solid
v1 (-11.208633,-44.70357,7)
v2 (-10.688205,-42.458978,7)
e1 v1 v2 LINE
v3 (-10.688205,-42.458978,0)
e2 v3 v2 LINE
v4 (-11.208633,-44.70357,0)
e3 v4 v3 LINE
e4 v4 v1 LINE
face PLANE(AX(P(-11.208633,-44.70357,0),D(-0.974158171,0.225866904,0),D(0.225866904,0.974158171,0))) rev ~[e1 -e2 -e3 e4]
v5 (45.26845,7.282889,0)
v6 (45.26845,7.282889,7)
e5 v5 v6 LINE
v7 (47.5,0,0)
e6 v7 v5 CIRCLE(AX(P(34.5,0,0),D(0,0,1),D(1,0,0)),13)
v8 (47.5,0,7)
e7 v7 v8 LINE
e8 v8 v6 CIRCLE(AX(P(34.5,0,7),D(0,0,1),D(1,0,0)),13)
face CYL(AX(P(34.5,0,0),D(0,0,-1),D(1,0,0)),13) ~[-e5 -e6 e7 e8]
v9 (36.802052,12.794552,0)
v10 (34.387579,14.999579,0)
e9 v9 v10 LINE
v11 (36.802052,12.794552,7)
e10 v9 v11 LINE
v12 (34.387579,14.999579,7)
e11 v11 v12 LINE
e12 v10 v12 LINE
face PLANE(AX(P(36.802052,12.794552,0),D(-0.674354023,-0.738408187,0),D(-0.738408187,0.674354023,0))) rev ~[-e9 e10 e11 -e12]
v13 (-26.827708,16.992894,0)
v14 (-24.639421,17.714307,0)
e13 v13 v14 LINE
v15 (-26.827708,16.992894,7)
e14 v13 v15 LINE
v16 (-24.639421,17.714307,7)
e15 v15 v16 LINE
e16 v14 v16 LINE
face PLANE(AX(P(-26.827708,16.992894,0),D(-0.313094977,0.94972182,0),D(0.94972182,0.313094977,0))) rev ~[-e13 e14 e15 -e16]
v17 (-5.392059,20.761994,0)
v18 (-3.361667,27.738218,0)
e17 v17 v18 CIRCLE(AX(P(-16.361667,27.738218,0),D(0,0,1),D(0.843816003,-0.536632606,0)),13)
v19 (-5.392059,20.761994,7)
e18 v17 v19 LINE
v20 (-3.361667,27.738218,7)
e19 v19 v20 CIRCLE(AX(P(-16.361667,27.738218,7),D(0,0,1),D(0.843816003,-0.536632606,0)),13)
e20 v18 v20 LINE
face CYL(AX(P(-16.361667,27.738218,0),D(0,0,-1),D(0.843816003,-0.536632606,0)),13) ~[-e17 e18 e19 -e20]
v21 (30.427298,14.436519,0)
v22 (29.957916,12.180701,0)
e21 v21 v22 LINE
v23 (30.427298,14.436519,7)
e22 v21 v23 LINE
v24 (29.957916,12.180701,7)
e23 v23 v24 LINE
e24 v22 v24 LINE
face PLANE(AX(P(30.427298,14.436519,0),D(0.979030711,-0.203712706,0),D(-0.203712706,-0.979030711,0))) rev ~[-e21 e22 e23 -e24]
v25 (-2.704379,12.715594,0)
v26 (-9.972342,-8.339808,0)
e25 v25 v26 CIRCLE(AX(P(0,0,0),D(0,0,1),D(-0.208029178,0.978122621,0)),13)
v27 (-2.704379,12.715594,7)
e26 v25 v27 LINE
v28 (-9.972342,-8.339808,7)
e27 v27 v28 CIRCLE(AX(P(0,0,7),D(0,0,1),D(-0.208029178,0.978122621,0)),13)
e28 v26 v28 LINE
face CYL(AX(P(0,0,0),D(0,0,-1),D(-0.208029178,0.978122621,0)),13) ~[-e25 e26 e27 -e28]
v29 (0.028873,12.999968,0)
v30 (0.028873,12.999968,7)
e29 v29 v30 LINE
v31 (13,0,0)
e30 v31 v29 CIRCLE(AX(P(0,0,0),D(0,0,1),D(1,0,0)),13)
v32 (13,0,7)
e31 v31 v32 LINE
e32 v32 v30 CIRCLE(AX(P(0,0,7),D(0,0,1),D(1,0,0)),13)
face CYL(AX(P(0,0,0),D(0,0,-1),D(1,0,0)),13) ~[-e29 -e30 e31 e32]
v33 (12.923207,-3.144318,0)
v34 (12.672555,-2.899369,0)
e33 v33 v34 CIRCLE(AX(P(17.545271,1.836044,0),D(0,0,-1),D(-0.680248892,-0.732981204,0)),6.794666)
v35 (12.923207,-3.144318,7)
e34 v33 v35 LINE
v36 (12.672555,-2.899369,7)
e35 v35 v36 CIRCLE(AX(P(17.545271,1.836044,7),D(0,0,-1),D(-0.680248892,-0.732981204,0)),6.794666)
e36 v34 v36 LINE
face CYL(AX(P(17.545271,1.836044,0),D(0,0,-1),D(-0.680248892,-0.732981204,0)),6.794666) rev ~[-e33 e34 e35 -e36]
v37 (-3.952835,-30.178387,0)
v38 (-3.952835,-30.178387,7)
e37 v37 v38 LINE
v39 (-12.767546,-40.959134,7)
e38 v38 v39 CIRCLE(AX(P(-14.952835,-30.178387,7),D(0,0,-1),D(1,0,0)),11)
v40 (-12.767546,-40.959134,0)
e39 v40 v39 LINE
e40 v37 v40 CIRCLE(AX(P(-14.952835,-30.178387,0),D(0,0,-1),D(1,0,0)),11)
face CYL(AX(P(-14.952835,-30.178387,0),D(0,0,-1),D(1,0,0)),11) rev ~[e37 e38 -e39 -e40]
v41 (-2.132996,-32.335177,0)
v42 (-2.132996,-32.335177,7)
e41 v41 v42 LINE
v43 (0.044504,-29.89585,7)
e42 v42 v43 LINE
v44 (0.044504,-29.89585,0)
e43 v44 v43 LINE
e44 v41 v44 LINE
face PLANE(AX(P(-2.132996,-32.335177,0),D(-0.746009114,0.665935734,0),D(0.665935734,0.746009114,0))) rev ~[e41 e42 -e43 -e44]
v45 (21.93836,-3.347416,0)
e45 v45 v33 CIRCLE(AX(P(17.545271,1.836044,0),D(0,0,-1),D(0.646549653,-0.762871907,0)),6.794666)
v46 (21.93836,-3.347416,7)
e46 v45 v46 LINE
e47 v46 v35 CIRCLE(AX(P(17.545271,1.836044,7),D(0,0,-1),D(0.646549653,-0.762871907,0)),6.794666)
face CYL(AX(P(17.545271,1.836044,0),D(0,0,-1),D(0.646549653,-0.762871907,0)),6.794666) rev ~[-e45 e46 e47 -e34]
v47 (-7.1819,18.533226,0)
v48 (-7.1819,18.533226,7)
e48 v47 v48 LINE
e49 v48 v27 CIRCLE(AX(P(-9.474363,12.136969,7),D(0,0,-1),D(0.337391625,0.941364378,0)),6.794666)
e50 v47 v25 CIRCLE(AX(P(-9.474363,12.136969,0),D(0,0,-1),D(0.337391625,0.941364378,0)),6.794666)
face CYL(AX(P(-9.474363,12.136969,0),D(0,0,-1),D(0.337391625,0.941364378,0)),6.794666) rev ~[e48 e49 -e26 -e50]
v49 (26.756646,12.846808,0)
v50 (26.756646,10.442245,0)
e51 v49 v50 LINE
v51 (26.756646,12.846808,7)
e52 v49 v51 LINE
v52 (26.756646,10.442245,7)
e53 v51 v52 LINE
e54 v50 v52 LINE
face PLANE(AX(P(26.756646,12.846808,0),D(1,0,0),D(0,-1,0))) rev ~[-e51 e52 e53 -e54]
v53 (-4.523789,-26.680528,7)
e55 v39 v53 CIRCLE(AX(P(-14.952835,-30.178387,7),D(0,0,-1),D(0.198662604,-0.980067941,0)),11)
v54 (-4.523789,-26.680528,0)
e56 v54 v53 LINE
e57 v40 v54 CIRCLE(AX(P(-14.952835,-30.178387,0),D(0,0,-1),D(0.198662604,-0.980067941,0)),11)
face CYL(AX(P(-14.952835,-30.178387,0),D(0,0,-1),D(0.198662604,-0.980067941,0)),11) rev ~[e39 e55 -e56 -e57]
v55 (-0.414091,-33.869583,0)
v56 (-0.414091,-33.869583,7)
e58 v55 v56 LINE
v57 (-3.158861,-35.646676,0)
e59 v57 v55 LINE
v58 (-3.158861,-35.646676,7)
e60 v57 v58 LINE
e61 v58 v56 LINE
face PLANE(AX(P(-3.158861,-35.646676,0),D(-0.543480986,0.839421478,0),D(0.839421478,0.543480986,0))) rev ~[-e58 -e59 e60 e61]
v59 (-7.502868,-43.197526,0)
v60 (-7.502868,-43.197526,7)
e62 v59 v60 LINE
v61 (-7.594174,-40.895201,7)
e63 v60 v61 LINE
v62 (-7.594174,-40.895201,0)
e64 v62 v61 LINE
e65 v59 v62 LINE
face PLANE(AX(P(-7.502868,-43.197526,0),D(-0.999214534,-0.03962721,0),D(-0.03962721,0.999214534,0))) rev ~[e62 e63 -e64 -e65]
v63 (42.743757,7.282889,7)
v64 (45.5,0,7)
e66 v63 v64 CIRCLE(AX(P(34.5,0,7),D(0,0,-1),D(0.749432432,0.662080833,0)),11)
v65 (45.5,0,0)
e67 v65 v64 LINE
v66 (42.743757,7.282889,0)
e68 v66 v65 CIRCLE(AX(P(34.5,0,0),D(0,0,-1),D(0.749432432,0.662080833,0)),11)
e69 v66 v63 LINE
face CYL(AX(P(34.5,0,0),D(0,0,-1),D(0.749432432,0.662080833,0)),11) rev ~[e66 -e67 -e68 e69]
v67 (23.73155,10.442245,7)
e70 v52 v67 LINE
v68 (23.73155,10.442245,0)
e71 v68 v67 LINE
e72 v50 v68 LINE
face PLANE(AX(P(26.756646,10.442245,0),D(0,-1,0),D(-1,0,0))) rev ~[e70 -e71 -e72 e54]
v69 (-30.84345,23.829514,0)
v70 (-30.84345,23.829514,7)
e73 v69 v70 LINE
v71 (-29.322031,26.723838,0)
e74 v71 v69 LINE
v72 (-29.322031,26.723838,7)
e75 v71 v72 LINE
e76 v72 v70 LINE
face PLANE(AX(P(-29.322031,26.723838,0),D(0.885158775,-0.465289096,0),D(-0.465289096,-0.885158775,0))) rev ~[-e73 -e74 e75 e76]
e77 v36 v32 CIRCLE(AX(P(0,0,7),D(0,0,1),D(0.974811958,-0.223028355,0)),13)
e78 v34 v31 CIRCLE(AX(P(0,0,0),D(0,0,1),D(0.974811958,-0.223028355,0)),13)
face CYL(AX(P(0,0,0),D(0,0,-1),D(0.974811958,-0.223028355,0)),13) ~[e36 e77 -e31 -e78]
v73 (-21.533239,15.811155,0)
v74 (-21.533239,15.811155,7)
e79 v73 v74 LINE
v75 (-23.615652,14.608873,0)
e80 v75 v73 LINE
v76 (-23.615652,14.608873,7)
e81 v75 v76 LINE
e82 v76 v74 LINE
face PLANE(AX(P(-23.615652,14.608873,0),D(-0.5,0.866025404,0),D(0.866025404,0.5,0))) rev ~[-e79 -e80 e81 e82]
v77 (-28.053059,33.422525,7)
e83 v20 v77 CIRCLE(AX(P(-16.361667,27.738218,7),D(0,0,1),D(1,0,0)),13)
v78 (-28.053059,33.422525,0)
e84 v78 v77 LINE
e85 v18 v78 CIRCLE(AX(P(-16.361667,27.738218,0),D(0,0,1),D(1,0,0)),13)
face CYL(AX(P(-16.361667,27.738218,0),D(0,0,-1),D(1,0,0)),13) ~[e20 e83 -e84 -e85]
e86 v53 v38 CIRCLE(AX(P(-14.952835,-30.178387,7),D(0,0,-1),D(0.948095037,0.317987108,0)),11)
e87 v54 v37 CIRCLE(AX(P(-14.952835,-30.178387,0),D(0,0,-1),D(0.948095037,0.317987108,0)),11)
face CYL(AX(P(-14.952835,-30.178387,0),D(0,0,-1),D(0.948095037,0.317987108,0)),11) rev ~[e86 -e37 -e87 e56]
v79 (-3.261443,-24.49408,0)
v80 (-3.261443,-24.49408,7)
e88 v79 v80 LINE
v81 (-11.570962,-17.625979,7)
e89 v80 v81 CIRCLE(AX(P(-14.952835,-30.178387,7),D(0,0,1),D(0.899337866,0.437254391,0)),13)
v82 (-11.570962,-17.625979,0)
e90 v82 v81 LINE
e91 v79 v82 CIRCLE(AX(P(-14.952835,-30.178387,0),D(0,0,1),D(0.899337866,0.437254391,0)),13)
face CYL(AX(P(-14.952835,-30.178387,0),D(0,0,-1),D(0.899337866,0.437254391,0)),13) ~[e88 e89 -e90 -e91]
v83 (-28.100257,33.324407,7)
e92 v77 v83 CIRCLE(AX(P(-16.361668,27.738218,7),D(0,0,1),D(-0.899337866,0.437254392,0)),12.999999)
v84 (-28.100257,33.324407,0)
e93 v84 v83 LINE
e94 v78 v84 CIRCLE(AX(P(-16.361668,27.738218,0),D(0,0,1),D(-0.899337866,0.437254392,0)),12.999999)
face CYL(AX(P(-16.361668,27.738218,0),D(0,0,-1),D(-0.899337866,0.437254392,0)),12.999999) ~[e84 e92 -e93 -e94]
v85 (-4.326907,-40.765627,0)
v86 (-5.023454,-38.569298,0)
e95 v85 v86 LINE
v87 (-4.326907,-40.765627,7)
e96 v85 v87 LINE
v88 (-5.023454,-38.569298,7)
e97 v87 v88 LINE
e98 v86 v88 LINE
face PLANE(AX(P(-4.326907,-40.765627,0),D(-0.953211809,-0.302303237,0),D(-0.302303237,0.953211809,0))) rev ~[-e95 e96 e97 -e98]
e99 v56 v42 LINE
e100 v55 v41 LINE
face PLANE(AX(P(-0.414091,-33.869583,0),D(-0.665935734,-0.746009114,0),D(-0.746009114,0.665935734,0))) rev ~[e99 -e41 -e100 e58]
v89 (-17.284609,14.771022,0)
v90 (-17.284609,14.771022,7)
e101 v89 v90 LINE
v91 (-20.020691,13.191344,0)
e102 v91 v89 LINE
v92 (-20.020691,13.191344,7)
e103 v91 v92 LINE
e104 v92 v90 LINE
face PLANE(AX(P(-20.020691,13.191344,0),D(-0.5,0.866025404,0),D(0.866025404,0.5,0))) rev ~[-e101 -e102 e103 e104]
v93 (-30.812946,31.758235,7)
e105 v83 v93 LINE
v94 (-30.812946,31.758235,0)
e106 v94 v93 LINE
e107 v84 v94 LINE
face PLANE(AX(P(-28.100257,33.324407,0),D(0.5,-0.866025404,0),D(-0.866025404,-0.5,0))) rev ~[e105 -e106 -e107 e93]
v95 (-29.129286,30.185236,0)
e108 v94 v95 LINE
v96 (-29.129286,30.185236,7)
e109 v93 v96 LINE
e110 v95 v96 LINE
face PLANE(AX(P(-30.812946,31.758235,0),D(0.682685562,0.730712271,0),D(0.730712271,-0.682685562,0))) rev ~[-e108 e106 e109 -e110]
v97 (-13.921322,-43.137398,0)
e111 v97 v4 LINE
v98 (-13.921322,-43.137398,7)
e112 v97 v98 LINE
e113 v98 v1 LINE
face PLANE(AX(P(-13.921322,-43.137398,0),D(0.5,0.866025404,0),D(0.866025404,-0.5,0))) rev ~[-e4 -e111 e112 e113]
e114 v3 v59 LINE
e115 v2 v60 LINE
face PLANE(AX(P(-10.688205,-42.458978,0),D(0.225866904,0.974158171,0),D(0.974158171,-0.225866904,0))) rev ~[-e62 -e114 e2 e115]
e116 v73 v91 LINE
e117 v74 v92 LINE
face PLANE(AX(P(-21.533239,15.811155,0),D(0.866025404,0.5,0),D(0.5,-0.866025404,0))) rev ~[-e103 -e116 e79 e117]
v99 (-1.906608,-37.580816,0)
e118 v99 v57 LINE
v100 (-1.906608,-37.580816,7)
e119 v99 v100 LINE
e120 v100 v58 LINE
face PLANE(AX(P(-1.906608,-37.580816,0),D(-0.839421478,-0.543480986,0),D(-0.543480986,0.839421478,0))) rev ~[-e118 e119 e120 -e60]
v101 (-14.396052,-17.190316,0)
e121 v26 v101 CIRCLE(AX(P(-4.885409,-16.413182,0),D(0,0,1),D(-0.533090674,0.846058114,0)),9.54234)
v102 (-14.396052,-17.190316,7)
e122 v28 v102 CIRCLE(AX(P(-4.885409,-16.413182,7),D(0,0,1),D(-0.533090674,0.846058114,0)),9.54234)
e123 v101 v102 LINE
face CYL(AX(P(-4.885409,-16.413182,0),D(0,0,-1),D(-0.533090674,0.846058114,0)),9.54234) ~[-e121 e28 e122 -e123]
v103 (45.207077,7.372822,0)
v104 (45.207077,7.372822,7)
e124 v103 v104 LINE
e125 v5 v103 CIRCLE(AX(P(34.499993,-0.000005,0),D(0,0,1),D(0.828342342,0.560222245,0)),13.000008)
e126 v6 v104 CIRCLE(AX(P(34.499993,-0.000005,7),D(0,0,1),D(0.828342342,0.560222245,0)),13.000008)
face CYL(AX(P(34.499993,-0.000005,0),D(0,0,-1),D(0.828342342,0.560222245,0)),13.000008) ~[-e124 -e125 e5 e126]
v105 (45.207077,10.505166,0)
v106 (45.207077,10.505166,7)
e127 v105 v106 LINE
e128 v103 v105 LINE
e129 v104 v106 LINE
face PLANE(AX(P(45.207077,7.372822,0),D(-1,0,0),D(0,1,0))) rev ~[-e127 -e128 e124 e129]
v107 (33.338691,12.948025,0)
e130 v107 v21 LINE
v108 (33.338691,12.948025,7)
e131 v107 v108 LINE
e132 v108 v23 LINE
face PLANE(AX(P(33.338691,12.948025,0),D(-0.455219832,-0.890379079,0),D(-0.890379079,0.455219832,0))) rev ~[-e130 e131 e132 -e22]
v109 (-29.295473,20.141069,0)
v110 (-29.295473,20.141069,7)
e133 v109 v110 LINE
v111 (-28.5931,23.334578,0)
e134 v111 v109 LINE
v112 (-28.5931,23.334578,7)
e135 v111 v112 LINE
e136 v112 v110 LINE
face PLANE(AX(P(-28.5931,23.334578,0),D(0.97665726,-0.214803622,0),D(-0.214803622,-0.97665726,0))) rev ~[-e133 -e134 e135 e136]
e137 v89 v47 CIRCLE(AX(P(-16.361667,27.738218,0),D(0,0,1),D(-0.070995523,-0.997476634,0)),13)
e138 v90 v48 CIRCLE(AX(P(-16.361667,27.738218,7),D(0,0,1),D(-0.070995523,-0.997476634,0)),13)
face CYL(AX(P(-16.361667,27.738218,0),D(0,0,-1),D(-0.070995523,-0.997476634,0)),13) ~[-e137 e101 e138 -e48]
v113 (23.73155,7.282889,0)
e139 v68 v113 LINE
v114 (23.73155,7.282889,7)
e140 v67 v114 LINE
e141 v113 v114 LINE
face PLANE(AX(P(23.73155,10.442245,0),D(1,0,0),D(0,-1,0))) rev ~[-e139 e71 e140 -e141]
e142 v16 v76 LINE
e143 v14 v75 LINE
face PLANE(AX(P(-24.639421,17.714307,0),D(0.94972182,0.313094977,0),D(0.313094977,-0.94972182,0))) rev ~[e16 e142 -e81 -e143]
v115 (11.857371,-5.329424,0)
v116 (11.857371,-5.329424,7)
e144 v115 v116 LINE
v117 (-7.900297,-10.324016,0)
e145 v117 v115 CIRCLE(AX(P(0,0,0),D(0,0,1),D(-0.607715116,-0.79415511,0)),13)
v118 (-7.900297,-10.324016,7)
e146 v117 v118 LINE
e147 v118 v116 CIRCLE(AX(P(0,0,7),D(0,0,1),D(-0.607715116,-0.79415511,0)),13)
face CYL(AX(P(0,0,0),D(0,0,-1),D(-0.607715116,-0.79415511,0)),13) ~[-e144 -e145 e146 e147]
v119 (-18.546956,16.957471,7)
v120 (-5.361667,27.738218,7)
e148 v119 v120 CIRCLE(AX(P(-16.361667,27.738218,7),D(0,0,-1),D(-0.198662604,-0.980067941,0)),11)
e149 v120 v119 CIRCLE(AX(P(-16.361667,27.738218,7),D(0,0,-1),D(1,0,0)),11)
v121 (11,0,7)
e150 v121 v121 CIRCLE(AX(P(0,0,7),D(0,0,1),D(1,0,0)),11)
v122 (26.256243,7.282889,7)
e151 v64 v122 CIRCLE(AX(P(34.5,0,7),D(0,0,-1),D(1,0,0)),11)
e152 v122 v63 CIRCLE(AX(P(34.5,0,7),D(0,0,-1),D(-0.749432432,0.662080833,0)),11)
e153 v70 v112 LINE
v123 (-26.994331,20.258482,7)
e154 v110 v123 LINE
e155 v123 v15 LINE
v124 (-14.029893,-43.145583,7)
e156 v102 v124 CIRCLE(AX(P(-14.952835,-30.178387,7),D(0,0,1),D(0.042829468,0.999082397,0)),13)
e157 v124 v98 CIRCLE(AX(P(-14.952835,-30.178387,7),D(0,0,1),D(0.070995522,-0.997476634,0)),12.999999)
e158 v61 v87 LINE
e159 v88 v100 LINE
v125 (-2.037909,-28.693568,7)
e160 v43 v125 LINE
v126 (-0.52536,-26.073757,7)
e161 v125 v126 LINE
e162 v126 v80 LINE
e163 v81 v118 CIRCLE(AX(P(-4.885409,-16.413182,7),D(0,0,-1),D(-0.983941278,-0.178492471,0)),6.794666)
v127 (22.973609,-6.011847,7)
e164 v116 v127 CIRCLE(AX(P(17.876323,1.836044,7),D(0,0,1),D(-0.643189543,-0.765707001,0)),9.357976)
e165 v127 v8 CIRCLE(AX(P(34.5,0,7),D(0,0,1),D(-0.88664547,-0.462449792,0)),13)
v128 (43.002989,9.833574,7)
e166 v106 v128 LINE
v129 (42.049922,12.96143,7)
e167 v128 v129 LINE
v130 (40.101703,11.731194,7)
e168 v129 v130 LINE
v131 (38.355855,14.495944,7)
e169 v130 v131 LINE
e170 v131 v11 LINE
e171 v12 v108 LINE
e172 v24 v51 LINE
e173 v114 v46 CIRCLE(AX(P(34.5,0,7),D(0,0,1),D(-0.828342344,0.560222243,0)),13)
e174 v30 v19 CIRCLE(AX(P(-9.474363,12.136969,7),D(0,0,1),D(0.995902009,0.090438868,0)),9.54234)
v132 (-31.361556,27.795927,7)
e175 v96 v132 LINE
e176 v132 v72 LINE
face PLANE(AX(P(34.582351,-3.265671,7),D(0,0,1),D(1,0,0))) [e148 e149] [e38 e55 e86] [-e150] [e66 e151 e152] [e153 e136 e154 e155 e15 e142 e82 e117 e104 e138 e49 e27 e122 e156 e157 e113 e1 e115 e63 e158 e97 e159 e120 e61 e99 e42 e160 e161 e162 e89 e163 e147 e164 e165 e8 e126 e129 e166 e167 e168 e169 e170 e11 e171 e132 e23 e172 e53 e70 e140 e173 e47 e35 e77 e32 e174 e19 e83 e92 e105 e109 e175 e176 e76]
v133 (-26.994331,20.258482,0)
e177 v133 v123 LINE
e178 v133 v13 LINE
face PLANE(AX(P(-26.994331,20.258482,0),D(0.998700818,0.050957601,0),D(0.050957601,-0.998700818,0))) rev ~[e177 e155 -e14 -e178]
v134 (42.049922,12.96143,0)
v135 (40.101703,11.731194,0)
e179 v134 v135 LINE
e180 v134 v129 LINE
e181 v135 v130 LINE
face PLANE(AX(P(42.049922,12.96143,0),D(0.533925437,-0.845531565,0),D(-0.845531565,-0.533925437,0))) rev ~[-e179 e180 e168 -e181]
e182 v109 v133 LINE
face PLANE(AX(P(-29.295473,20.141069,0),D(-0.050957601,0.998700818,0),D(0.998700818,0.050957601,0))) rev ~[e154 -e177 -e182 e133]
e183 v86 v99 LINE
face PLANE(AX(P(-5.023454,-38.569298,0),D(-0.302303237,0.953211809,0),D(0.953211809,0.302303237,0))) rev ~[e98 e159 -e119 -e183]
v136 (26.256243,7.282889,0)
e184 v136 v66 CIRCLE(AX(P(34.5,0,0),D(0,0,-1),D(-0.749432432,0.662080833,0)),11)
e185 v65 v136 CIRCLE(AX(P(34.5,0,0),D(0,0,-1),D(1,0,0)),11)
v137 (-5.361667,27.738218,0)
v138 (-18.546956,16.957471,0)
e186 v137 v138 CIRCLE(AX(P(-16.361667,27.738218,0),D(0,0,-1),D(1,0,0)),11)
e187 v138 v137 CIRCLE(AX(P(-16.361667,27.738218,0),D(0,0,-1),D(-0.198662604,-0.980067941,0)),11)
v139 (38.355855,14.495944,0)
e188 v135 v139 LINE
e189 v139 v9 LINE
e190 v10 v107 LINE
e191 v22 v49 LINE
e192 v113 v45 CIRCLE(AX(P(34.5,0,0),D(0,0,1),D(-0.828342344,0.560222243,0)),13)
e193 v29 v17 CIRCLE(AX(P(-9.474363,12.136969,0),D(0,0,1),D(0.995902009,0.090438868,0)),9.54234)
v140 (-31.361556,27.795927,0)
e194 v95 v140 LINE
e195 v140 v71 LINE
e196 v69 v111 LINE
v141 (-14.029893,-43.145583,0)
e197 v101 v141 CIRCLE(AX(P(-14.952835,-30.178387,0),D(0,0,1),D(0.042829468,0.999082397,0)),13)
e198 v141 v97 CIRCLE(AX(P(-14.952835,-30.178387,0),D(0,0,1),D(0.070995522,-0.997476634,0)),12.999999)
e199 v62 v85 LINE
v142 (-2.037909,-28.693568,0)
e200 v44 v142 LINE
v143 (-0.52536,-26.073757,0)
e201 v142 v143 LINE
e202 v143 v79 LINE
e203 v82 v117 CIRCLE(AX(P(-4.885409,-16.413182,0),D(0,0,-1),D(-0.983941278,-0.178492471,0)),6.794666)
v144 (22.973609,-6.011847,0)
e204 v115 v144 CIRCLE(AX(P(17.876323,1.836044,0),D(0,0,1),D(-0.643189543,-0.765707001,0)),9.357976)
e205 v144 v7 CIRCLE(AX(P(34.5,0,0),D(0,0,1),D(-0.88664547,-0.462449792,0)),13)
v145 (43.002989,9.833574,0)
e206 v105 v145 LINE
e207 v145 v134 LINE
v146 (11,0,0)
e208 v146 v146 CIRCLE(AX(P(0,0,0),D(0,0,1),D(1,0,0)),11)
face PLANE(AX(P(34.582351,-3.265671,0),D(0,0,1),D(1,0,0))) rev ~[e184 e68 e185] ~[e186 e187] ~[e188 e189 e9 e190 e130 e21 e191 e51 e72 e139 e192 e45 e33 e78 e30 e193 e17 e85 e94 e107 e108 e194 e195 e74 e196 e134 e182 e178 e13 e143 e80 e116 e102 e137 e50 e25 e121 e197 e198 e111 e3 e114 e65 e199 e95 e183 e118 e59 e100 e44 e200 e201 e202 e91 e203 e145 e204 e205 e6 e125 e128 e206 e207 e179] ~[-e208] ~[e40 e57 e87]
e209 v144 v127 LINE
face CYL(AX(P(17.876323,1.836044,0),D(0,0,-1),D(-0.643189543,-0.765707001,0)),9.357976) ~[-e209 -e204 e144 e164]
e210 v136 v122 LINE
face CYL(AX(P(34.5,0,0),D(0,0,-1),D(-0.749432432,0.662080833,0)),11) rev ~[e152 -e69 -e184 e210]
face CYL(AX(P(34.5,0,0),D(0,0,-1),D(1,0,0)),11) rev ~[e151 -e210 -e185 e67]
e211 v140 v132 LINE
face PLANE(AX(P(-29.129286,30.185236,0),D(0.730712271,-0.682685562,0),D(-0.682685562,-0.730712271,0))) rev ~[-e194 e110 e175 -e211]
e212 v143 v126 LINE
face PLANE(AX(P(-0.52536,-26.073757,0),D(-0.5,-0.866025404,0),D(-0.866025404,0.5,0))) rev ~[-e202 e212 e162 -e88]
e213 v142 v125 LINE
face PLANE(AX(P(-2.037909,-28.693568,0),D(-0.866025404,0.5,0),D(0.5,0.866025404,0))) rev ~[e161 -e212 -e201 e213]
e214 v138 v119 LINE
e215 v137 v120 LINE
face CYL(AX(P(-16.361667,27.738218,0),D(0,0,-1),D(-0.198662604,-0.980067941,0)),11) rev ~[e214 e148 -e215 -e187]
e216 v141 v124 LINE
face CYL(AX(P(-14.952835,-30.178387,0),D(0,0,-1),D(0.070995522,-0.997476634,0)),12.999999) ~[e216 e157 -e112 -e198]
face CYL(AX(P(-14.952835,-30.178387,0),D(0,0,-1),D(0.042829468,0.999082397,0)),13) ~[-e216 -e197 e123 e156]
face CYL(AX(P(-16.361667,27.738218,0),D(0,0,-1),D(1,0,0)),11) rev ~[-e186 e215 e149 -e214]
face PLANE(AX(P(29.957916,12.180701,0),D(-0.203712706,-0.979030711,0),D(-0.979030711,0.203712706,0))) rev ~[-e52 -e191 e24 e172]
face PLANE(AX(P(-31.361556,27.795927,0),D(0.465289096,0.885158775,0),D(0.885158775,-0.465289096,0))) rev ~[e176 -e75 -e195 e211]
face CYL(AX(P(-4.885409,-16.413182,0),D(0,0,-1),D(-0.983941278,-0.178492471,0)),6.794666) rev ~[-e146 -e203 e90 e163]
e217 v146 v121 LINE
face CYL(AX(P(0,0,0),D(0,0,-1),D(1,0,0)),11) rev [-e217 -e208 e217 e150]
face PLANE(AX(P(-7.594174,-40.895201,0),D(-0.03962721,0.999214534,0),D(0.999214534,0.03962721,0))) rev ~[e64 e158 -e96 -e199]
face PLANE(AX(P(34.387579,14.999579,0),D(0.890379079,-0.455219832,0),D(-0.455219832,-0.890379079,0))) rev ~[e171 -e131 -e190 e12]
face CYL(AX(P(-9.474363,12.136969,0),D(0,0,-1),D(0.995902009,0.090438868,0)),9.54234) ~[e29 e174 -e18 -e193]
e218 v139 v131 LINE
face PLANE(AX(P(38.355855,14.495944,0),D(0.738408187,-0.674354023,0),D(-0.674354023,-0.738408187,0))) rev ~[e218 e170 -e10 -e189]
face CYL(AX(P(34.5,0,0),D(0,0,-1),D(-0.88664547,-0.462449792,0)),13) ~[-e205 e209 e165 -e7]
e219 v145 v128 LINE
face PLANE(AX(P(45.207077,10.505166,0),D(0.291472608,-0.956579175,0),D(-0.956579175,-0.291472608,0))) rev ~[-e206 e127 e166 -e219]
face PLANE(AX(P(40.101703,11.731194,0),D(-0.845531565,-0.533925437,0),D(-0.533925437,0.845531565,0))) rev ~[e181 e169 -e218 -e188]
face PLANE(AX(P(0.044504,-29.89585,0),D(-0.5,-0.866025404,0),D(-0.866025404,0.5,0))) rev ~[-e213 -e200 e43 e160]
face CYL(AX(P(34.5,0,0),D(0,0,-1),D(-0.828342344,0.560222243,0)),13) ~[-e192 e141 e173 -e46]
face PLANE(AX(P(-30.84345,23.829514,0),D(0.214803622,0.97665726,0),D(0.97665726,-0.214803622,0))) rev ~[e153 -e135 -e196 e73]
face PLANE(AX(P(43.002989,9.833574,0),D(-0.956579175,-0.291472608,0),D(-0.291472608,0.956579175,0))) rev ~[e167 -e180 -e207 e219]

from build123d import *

# Parameters (mm, degrees)
F0_R     = 11
F1_DEPTH = 7


# Not quite as in the source:
# - a feature names something its author has since deleted; it is built from what else it names


with BuildPart() as f1:
    # F0 (on Top) → F1 (new body)
    with BuildSketch(Plane.XY):
        with BuildLine():
            ThreePointArc((42.7437567563, 7.2828891618), (44.7878891013, 3.8934994337), (45.5, 0))
            ThreePointArc((45.5, 0), (30.6065005663, -10.2878891013), (26.2562432437, 7.2828891618))
            Line((26.2562432437, 7.2828891618), (23.7315495331, 7.2828891618))
            ThreePointArc((23.7315495331, 7.2828891618), (21.6811026337, 2.16237608), (21.9383596578, -3.3474157066))
            ThreePointArc((21.9383596578, -3.3474157066), (22.3825285727, -4.708172279), (22.9736088848, -6.0118472917))
            ThreePointArc((22.9736088848, -6.0118472917), (37.5949083591, -12.6262243861), (47.5, 0))
            ThreePointArc((47.5, 0), (46.9295988686, 3.8085524764), (45.2684504669, 7.2828891618))
            Line((45.2684504669, 7.2828891618), (42.7437567563, 7.2828891618))
        make_face()
        with BuildLine():
            ThreePointArc((26.2562432437, 7.2828891618), (34.5, 11), (42.7437567563, 7.2828891618))
            Line((42.7437567563, 7.2828891618), (45.2684504669, 7.2828891618))
            ThreePointArc((45.2684504669, 7.2828891618), (45.2378577502, 7.3279199597), (45.207076728, 7.3728222508))
            ThreePointArc((45.207076728, 7.3728222508), (44.1835161526, 8.6734949658), (43.0029894611, 9.8335736243))
            ThreePointArc((43.0029894611, 9.8335736243), (41.6158857772, 10.879529843), (40.1017032771, 11.7311943295))
            ThreePointArc((40.1017032771, 11.7311943295), (38.4874829399, 12.3733576609), (36.8020522674, 12.7945517842))
            ThreePointArc((36.8020522674, 12.7945517842), (35.0755104688, 12.9872548177), (33.3386909351, 12.9480253806))
            ThreePointArc((33.3386909351, 12.9480253806), (31.6226106019, 12.6775640504), (29.9579160343, 12.1807008521))
            ThreePointArc((29.9579160343, 12.1807008521), (28.2960857777, 11.4241607272), (26.7566463688, 10.442244708))
            ThreePointArc((26.7566463688, 10.442244708), (25.1102659991, 8.9907116177), (23.7315495331, 7.2828891618))
            Line((23.7315495331, 7.2828891618), (26.2562432437, 7.2828891618))
        make_face()
        with BuildLine():
            Line((23.7315495331, 10.442244708), (23.7315495331, 7.2828891618))
            ThreePointArc((23.7315495331, 7.2828891618), (25.1102659991, 8.9907116177), (26.7566463688, 10.442244708))
            Line((26.7566463688, 10.442244708), (23.7315495331, 10.442244708))
        make_face()
        with BuildLine():
            ThreePointArc((43.0029894611, 9.8335736243), (44.1835161526, 8.6734949658), (45.207076728, 7.3728222508))
            Line((45.207076728, 7.3728222508), (45.207076728, 10.5051657741))
            Line((45.207076728, 10.5051657741), (43.0029894611, 9.8335736243))
        make_face()
        with BuildLine():
            Line((26.7566463688, 12.8468079515), (26.7566463688, 10.442244708))
            ThreePointArc((26.7566463688, 10.442244708), (28.2960857777, 11.4241607272), (29.9579160343, 12.1807008521))
            Line((29.9579160343, 12.1807008521), (26.7566463688, 12.8468079515))
        make_face()
        with BuildLine():
            ThreePointArc((22.9736088848, -6.0118472917), (22.3825285727, -4.708172279), (21.9383596578, -3.3474157066))
            ThreePointArc((21.9383596578, -3.3474157066), (17.3922362251, -4.9568983328), (12.9232065297, -3.1443183566))
            ThreePointArc((12.9232065297, -3.1443183566), (12.7963014273, -3.0234598131), (12.6725554503, -2.8993686138))
            ThreePointArc((12.6725554503, -2.8993686138), (12.3249994875, -4.1345359635), (11.8573707885, -5.3294237947))
            ThreePointArc((11.8573707885, -5.3294237947), (17.3029186127, -7.5043480898), (22.9736088848, -6.0118472917))
        make_face()
        with BuildLine():
            ThreePointArc((40.1017032771, 11.7311943295), (41.6158857772, 10.879529843), (43.0029894611, 9.8335736243))
            Line((43.0029894611, 9.8335736243), (42.0499218924, 12.9614304542))
            Line((42.0499218924, 12.9614304542), (40.1017032771, 11.7311943295))
        make_face()
        with BuildLine():
            Line((30.4272975488, 14.4365194817), (29.9579160343, 12.1807008521))
            ThreePointArc((29.9579160343, 12.1807008521), (31.6226106019, 12.6775640504), (33.3386909351, 12.9480253806))
            Line((33.3386909351, 12.9480253806), (30.4272975488, 14.4365194817))
        make_face()
        with BuildLine():
            ThreePointArc((-7.9002965036, -10.3240164255), (3.1860787986, -12.603527359), (11.8573707885, -5.3294237947))
            ThreePointArc((11.8573707885, -5.3294237947), (12.3249994875, -4.1345359635), (12.6725554503, -2.8993686138))
            ThreePointArc((12.6725554503, -2.8993686138), (12.9178794865, -1.4589001244), (13, 0))
            ThreePointArc((13, 0), (9.2025905119, 9.1821744631), (0.0288726353, 12.9999679373))
            ThreePointArc((0.0288726353, 12.9999679373), (-1.3452884897, 12.9302049048), (-2.7043793136, 12.715594069))
            ThreePointArc((-2.7043793136, 12.715594069), (-12.2885029344, 4.2417797718), (-9.9723418366, -8.339808049))
            ThreePointArc((-9.9723418366, -8.339808049), (-8.9912218875, -9.3892453887), (-7.9002965036, -10.3240164255))
        make_face()
        Circle(F0_R, mode=Mode.SUBTRACT)
        with BuildLine():
            ThreePointArc((36.8020522674, 12.7945517842), (38.4874829399, 12.3733576609), (40.1017032771, 11.7311943295))
            Line((40.1017032771, 11.7311943295), (38.3558547697, 14.4959437083))
            Line((38.3558547697, 14.4959437083), (36.8020522674, 12.7945517842))
        make_face()
        with BuildLine():
            Line((34.3875787435, 14.9995787095), (33.3386909351, 12.9480253806))
            ThreePointArc((33.3386909351, 12.9480253806), (35.0755104688, 12.9872548177), (36.8020522674, 12.7945517842))
            Line((36.8020522674, 12.7945517842), (34.3875787435, 14.9995787095))
        make_face()
        with BuildLine():
            ThreePointArc((-11.5709617185, -17.6259791714), (-10.9561833098, -13.361430461), (-7.9002965036, -10.3240164255))
            ThreePointArc((-7.9002965036, -10.3240164255), (-8.9912218875, -9.3892453887), (-9.9723418366, -8.339808049))
            ThreePointArc((-9.9723418366, -8.339808049), (-13.420933272, -12.1469092689), (-14.3960517714, -17.1903155086))
            ThreePointArc((-14.3960517714, -17.1903155086), (-12.971495936, -17.3302624491), (-11.5709617185, -17.6259791714))
        make_face()
        with BuildLine():
            ThreePointArc((-3.2614425902, -24.4940795914), (-6.6707135497, -20.1580839465), (-11.5709617185, -17.6259791714))
            ThreePointArc((-11.5709617185, -17.6259791714), (-12.971495936, -17.3302624491), (-14.3960517714, -17.1903155086))
            ThreePointArc((-14.3960517714, -17.1903155086), (-27.9515414405, -30.3617633129), (-14.0298930571, -43.1455829188))
            Line((-14.0298930571, -43.1455829188), (-12.7675462018, -40.9591340287))
            ThreePointArc((-12.7675462018, -40.9591340287), (-24.4791142923, -24.6783866742), (-4.5237894455, -26.6805284815))
            Line((-4.5237894455, -26.6805284815), (-3.2614425902, -24.4940795914))
        make_face()
        with BuildLine():
            ThreePointArc((-2.7043793136, 12.715594069), (-1.3452884897, 12.9302049048), (0.0288726353, 12.9999679373))
            ThreePointArc((0.0288726353, 12.9999679373), (-1.6510654504, 17.6006925658), (-5.3920588945, 20.7619940589))
            ThreePointArc((-5.3920588945, 20.7619940589), (-6.2255344178, 19.5982659865), (-7.1818997204, 18.5332261365))
            ThreePointArc((-7.1818997204, 18.5332261365), (-4.0898299015, 16.2811568981), (-2.7043793136, 12.715594069))
        make_face()
        with BuildLine():
            Line((-0.5253604276, -26.0737573645), (-3.2614425902, -24.4940795914))
            ThreePointArc((-3.2614425902, -24.4940795914), (-2.4717831912, -26.5419943035), (-2.0379088454, -28.6935680732))
            Line((-2.0379088454, -28.6935680732), (-0.5253604276, -26.0737573645))
        make_face()
        with BuildLine():
            ThreePointArc((-2.0379088454, -28.6935680732), (-2.4717831912, -26.5419943035), (-3.2614425902, -24.4940795914))
            Line((-3.2614425902, -24.4940795914), (-4.5237894455, -26.6805284815))
            ThreePointArc((-4.5237894455, -26.6805284815), (-4.0965118208, -28.4063115428), (-3.9528348507, -30.1783866742))
            ThreePointArc((-3.9528348507, -30.1783866742), (-6.4370208809, -37.1412102704), (-12.7675462018, -40.9591340287))
            Line((-12.7675462018, -40.9591340287), (-14.0298930571, -43.1455829188))
            ThreePointArc((-14.0298930571, -43.1455829188), (-13.9755988838, -43.141604248), (-13.9213218479, -43.1373982463))
            ThreePointArc((-13.9213218479, -43.1373982463), (-12.283125947, -42.9013051432), (-10.6882050126, -42.4589783678))
            ThreePointArc((-10.6882050126, -42.4589783678), (-9.088828514, -41.7806894492), (-7.5941741832, -40.8952011814))
            ThreePointArc((-7.5941741832, -40.8952011814), (-6.2309342562, -39.8183270277), (-5.0234541092, -38.5692983107))
            ThreePointArc((-5.0234541092, -38.5692983107), (-3.9932974875, -37.1704207692), (-3.1588614098, -35.6466762127))
            ThreePointArc((-3.1588614098, -35.6466762127), (-2.5350476259, -34.0252763841), (-2.132996494, -32.3351769998))
            ThreePointArc((-2.132996494, -32.3351769998), (-1.9979535576, -31.2605376256), (-1.9528348507, -30.1783866742))
            ThreePointArc((-1.9528348507, -30.1783866742), (-1.9741207759, -29.4347597747), (-2.0379088454, -28.6935680732))
        make_face()
        with BuildLine():
            ThreePointArc((-7.1818997204, 18.5332261365), (-6.2255344178, 19.5982659865), (-5.3920588945, 20.7619940589))
            ThreePointArc((-5.3920588945, 20.7619940589), (-3.8795816786, 24.105375001), (-3.3616669305, 27.7382179327))
            ThreePointArc((-3.3616669305, 27.7382179327), (-13.4451706923, 40.40684255), (-28.0530591909, 33.4225250156))
            Line((-28.0530591909, 33.4225250156), (-26.7907123357, 31.2360761255))
            ThreePointArc((-26.7907123357, 31.2360761255), (-14.589591799, 38.5945409626), (-5.3616669305, 27.7382179327))
            ThreePointArc((-5.3616669305, 27.7382179327), (-9.3988433343, 19.2224039629), (-18.5469555793, 16.9574705783))
            Line((-18.5469555793, 16.9574705783), (-17.2846087241, 14.7710216882))
            ThreePointArc((-17.2846087241, 14.7710216882), (-11.8248908651, 15.555539125), (-7.1818997204, 18.5332261365))
        make_face()
        with BuildLine():
            Line((0.0445040084, -29.8958496949), (-2.0379088454, -28.6935680732))
            ThreePointArc((-2.0379088454, -28.6935680732), (-1.9741207759, -29.4347597747), (-1.9528348507, -30.1783866742))
            ThreePointArc((-1.9528348507, -30.1783866742), (-1.9979535576, -31.2605376256), (-2.132996494, -32.3351769998))
            Line((-2.132996494, -32.3351769998), (0.0445040084, -29.8958496949))
        make_face()
        with BuildLine():
            Line((-20.0206908867, 13.191343915), (-17.2846087241, 14.7710216882))
            ThreePointArc((-17.2846087241, 14.7710216882), (-19.452984589, 15.1111139443), (-21.5332393046, 15.8111546236))
            Line((-21.5332393046, 15.8111546236), (-20.0206908867, 13.191343915))
        make_face()
        with BuildLine():
            ThreePointArc((-21.5332393046, 15.8111546236), (-19.452984589, 15.1111139443), (-17.2846087241, 14.7710216882))
            Line((-17.2846087241, 14.7710216882), (-18.5469555793, 16.9574705783))
            ThreePointArc((-18.5469555793, 16.9574705783), (-25.8879463721, 22.2382179327), (-26.7907123357, 31.2360761255))
            Line((-26.7907123357, 31.2360761255), (-28.0530591909, 33.4225250156))
            ThreePointArc((-28.0530591909, 33.4225250156), (-28.0767606476, 33.3735155468), (-28.1002566612, 33.3244072541))
            ThreePointArc((-28.1002566612, 33.3244072541), (-28.7148919868, 31.7876414359), (-29.1292862296, 30.185236002))
            ThreePointArc((-29.1292862296, 30.185236002), (-29.3415590444, 28.4609908647), (-29.322030875, 26.7238381104))
            ThreePointArc((-29.322030875, 26.7238381104), (-29.0710504648, 25.0048006254), (-28.5930999393, 23.334577785))
            ThreePointArc((-28.5930999393, 23.334577785), (-27.8967147624, 21.74299721), (-26.9943313064, 20.2584820906))
            ThreePointArc((-26.9943313064, 20.2584820906), (-25.9020647571, 18.9075435922), (-24.6394213214, 17.7143074062))
            ThreePointArc((-24.6394213214, 17.7143074062), (-23.153323226, 16.6533902497), (-21.5332393046, 15.8111546236))
        make_face()
        with BuildLine():
            ThreePointArc((-10.6882050126, -42.4589783678), (-12.283125947, -42.9013051432), (-13.9213218479, -43.1373982463))
            Line((-13.9213218479, -43.1373982463), (-11.2086327833, -44.703570008))
            Line((-11.2086327833, -44.703570008), (-10.6882050126, -42.4589783678))
        make_face()
        with BuildLine():
            Line((-23.6156521584, 14.6088730019), (-21.5332393046, 15.8111546236))
            ThreePointArc((-21.5332393046, 15.8111546236), (-23.153323226, 16.6533902497), (-24.6394213214, 17.7143074062))
            Line((-24.6394213214, 17.7143074062), (-23.6156521584, 14.6088730019))
        make_face()
        with BuildLine():
            ThreePointArc((-7.5941741832, -40.8952011814), (-9.088828514, -41.7806894492), (-10.6882050126, -42.4589783678))
            Line((-10.6882050126, -42.4589783678), (-7.5028677542, -43.1975260567))
            Line((-7.5028677542, -43.1975260567), (-7.5941741832, -40.8952011814))
        make_face()
        with BuildLine():
            Line((-0.4140910118, -33.8695826303), (-2.132996494, -32.3351769998))
            ThreePointArc((-2.132996494, -32.3351769998), (-2.5350476259, -34.0252763841), (-3.1588614098, -35.6466762127))
            Line((-3.1588614098, -35.6466762127), (-0.4140910118, -33.8695826303))
        make_face()
        with BuildLine():
            ThreePointArc((-29.1292862296, 30.185236002), (-28.7148919868, 31.7876414359), (-28.1002566612, 33.3244072541))
            Line((-28.1002566612, 33.3244072541), (-30.8129457258, 31.7582354924))
            Line((-30.8129457258, 31.7582354924), (-29.1292862296, 30.185236002))
        make_face()
        with BuildLine():
            Line((-26.8277083182, 16.9928944072), (-24.6394213214, 17.7143074062))
            ThreePointArc((-24.6394213214, 17.7143074062), (-25.9020647571, 18.9075435922), (-26.9943313064, 20.2584820906))
            Line((-26.9943313064, 20.2584820906), (-26.8277083182, 16.9928944072))
        make_face()
        with BuildLine():
            ThreePointArc((-5.0234541092, -38.5692983107), (-6.2309342562, -39.8183270277), (-7.5941741832, -40.8952011814))
            Line((-7.5941741832, -40.8952011814), (-4.3269067323, -40.7656267122))
            Line((-4.3269067323, -40.7656267122), (-5.0234541092, -38.5692983107))
        make_face()
        with BuildLine():
            Line((-1.906608014, -37.5808163649), (-3.1588614098, -35.6466762127))
            ThreePointArc((-3.1588614098, -35.6466762127), (-3.9932974875, -37.1704207692), (-5.0234541092, -38.5692983107))
            Line((-5.0234541092, -38.5692983107), (-1.906608014, -37.5808163649))
        make_face()
        with BuildLine():
            ThreePointArc((-29.322030875, 26.7238381104), (-29.3415590444, 28.4609908647), (-29.1292862296, 30.185236002))
            Line((-29.1292862296, 30.185236002), (-31.3615559194, 27.795926861))
            Line((-31.3615559194, 27.795926861), (-29.322030875, 26.7238381104))
        make_face()
        with BuildLine():
            Line((-29.2954725106, 20.1410689139), (-26.9943313064, 20.2584820906))
            ThreePointArc((-26.9943313064, 20.2584820906), (-27.8967147624, 21.74299721), (-28.5930999393, 23.334577785))
            Line((-28.5930999393, 23.334577785), (-29.2954725106, 20.1410689139))
        make_face()
        with BuildLine():
            ThreePointArc((-28.5930999393, 23.334577785), (-29.0710504648, 25.0048006254), (-29.322030875, 26.7238381104))
            Line((-29.322030875, 26.7238381104), (-30.8434498185, 23.8295142624))
            Line((-30.8434498185, 23.8295142624), (-28.5930999393, 23.334577785))
        make_face()
    extrude(amount=F1_DEPTH)


solid = f1.part
